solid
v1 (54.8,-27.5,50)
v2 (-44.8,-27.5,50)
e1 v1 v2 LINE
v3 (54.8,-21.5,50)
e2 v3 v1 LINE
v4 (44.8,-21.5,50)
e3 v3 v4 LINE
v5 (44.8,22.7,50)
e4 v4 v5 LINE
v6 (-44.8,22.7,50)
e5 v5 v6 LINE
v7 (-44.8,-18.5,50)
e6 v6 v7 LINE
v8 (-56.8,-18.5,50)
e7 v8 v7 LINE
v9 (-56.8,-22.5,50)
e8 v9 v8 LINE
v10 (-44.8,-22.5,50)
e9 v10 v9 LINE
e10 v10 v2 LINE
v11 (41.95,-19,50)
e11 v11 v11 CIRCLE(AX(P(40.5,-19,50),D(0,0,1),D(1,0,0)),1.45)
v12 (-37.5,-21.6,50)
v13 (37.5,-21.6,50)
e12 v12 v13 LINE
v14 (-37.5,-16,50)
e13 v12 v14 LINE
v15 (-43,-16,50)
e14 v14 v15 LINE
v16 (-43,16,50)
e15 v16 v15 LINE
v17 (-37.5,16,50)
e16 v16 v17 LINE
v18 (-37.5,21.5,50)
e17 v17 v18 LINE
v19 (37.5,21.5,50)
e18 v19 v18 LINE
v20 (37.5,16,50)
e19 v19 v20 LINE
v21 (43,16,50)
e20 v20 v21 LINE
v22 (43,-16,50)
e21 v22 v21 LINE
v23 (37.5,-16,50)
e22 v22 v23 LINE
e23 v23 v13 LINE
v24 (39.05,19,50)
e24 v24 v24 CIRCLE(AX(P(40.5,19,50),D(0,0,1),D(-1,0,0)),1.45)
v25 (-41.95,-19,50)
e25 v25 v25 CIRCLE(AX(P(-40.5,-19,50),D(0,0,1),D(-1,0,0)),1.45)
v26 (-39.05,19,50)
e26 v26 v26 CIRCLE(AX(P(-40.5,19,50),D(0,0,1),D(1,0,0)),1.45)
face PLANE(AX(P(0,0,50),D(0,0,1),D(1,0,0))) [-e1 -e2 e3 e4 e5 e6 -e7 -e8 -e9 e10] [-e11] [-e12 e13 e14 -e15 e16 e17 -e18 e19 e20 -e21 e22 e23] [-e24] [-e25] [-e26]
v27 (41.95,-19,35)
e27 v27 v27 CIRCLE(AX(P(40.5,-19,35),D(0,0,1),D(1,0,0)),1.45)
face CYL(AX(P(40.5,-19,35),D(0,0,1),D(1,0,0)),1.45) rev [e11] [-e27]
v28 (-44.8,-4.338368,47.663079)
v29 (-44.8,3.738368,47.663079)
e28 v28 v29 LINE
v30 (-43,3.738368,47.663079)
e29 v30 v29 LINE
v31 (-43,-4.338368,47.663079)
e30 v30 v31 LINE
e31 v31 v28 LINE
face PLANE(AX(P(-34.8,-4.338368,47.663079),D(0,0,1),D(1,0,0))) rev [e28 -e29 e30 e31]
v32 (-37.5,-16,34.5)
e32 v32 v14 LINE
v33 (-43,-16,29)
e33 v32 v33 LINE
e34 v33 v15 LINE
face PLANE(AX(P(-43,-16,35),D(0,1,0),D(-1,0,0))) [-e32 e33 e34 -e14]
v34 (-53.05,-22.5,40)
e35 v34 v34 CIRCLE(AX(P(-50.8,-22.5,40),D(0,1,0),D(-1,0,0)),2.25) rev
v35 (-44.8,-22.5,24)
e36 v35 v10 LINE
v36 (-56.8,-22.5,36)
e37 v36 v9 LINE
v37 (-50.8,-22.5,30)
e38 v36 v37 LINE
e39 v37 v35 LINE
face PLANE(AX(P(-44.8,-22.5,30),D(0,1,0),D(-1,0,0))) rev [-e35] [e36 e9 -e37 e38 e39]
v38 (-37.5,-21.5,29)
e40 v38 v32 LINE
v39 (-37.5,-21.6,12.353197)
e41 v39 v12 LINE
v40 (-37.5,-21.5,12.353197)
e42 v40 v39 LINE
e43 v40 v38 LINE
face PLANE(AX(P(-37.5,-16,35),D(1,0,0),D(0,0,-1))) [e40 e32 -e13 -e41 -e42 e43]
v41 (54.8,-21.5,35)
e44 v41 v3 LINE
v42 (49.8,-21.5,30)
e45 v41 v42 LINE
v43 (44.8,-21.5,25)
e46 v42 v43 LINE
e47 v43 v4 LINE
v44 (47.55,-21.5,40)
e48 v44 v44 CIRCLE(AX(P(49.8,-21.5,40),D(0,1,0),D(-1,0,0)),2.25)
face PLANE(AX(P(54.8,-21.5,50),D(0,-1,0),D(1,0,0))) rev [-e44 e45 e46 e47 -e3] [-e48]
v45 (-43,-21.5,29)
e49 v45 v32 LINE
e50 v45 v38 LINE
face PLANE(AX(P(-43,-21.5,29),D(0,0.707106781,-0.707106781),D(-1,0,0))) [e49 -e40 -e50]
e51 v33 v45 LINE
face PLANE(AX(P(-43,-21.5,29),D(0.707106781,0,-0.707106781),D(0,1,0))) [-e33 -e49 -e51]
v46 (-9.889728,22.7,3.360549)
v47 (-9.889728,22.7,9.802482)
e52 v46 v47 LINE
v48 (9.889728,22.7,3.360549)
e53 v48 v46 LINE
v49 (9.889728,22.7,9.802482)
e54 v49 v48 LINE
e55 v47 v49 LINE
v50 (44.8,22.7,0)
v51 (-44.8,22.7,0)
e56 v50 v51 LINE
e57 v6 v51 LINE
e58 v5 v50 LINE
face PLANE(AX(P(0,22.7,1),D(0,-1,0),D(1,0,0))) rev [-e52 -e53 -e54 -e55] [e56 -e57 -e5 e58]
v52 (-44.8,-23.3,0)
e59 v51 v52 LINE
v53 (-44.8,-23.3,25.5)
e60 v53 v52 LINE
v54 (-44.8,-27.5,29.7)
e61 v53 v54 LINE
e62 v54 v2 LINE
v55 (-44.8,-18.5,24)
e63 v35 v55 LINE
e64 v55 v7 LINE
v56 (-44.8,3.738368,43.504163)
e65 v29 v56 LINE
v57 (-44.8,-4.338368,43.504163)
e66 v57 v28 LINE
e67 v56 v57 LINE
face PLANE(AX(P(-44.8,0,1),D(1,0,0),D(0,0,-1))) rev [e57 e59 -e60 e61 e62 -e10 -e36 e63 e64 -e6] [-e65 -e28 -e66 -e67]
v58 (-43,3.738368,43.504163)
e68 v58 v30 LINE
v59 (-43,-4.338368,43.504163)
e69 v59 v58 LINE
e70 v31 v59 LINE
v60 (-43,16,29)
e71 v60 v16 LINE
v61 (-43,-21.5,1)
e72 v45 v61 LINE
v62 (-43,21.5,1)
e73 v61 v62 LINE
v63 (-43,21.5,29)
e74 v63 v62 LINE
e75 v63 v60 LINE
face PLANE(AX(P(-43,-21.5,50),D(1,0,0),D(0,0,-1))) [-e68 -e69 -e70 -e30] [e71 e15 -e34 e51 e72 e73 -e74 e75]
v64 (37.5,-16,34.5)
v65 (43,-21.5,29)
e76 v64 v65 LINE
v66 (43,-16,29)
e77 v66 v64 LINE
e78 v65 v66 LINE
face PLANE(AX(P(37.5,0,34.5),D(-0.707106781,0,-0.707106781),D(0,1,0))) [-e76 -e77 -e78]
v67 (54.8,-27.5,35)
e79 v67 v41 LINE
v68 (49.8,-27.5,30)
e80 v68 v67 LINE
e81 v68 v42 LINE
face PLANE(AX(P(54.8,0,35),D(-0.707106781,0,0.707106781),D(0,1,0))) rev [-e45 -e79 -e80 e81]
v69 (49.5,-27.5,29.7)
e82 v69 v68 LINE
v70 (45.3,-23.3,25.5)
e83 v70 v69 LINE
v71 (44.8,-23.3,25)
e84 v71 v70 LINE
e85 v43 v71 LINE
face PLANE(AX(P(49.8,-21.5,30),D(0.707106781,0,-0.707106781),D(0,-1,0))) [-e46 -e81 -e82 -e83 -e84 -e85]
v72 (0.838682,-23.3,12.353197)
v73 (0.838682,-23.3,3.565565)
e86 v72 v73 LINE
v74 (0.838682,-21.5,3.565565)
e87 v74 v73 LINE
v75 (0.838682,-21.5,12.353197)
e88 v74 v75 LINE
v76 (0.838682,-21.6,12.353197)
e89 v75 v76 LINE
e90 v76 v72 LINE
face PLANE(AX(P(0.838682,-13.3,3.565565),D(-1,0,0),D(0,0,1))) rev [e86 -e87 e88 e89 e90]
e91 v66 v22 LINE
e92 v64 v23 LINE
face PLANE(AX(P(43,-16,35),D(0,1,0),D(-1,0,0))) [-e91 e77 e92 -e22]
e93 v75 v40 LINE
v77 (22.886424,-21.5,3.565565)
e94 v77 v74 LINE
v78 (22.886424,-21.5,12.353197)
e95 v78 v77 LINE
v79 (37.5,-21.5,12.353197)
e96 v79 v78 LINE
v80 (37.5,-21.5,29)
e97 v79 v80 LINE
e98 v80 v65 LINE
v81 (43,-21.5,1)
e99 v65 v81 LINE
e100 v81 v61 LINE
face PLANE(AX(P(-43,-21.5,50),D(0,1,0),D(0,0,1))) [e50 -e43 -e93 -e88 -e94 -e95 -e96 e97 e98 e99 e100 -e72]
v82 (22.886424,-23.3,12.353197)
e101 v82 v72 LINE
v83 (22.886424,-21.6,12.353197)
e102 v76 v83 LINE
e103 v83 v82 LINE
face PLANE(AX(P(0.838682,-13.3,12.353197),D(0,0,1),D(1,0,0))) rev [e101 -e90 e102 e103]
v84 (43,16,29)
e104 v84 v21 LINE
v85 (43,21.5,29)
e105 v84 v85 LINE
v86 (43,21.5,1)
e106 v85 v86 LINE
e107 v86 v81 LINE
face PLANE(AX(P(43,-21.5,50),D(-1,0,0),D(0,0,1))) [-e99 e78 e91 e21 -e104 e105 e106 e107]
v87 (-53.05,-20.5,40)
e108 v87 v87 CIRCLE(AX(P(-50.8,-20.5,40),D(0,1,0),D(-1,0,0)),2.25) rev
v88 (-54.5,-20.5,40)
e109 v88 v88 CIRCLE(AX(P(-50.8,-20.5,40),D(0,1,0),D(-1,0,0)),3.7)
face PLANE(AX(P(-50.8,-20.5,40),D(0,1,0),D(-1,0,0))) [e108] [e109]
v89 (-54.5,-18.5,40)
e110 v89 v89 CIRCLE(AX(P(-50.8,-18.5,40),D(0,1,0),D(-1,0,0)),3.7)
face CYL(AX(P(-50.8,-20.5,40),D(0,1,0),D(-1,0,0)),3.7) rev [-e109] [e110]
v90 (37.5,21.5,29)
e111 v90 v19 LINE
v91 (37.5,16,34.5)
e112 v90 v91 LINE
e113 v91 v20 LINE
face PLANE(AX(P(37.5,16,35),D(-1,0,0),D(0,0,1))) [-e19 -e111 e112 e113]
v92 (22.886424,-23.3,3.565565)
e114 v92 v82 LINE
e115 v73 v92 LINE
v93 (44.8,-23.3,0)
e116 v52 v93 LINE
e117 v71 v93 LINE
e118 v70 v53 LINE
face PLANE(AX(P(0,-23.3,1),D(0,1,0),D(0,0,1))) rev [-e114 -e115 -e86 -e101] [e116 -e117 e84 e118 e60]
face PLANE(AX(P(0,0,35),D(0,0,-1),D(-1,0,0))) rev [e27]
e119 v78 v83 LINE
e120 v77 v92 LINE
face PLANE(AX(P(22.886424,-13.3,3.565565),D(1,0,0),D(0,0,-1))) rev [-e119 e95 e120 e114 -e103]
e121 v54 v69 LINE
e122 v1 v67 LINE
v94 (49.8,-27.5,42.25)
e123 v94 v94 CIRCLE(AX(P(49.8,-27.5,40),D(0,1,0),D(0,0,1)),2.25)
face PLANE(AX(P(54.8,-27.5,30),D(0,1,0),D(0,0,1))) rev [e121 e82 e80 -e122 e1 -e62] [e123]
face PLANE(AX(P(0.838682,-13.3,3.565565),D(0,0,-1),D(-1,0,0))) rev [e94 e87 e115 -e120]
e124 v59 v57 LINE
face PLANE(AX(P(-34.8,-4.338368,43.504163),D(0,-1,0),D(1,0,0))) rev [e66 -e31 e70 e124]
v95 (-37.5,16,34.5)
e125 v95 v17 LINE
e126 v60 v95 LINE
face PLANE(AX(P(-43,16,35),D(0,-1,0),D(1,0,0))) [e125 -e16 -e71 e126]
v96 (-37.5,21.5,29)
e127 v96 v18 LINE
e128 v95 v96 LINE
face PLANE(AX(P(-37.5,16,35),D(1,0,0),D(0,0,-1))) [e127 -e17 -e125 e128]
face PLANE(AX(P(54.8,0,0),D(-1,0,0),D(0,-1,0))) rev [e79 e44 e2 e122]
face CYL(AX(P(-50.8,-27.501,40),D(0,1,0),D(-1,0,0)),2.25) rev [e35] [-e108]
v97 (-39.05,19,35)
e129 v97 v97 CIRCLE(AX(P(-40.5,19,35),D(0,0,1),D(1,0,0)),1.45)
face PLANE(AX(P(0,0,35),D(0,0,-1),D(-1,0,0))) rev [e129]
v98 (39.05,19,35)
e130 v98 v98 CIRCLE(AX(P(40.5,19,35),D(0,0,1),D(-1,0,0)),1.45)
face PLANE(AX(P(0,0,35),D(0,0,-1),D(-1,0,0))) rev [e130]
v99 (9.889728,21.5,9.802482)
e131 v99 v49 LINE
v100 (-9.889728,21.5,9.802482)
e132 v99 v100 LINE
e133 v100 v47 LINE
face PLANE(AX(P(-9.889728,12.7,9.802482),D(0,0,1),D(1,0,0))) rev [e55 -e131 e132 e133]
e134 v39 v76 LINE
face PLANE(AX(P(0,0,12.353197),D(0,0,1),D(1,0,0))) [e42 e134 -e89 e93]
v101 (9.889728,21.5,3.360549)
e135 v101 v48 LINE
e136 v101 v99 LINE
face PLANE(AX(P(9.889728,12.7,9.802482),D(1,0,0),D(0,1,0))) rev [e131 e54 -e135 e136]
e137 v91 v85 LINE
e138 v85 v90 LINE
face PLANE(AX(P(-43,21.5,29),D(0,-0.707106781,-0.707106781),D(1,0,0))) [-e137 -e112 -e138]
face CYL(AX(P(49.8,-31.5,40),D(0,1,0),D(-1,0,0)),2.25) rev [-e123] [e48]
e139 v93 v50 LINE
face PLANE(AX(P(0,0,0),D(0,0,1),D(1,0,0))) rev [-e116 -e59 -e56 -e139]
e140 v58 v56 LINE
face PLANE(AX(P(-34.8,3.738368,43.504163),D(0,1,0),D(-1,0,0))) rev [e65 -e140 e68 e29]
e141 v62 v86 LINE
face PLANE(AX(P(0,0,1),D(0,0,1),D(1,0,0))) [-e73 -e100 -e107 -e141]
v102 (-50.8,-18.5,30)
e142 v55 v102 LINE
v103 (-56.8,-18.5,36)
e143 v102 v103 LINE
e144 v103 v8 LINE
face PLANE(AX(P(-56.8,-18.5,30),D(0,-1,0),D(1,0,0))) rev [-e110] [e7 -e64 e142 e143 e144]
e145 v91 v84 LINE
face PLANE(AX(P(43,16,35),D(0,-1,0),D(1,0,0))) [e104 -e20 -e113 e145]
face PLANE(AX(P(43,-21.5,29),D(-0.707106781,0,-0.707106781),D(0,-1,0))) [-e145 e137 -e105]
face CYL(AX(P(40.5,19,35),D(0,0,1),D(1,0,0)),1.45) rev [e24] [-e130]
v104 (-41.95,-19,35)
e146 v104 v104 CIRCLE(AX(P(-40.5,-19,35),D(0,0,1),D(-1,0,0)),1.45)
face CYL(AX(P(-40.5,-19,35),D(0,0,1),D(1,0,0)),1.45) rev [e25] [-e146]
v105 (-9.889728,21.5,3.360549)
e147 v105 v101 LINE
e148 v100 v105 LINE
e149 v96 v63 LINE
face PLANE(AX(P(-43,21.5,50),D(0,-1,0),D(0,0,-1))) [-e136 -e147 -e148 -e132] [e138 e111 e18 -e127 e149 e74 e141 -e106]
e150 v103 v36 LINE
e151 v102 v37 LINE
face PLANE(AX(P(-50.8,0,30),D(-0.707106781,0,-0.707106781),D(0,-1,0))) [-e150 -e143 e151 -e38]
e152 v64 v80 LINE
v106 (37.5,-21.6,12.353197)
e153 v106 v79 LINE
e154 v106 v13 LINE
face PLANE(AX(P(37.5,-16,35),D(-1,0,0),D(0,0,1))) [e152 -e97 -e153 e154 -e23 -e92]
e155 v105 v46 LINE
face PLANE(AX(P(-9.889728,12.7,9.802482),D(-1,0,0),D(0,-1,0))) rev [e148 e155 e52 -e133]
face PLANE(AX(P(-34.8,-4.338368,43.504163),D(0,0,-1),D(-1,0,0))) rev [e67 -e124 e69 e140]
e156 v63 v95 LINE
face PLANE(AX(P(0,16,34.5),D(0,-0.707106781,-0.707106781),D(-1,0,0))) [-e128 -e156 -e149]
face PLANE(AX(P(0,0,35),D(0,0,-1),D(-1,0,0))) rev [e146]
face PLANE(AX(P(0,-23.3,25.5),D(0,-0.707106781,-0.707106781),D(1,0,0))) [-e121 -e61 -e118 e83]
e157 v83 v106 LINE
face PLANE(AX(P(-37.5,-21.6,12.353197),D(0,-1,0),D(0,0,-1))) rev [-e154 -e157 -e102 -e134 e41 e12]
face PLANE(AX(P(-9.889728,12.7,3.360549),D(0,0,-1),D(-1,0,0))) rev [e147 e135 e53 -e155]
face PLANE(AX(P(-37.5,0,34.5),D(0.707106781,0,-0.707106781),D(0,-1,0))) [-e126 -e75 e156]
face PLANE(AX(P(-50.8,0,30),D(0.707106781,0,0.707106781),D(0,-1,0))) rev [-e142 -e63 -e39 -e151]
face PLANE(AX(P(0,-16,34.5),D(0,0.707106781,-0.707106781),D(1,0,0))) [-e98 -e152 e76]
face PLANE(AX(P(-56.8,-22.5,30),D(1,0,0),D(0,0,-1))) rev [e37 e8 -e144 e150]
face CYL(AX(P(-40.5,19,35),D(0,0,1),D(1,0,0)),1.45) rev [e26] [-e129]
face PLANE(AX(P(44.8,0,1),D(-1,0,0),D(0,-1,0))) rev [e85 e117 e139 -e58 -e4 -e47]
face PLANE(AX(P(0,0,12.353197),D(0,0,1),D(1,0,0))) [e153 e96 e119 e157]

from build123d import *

# Parameters (mm, degrees)
SKIZZE1_W                       = 89.6
SKIZZE1_H                       = 46
SKIZZE1_W_2                     = 86
SKIZZE1_H_2                     = 43
AUFSATZ_LINEAR_AUSTRAGEN1_DEPTH = 1
SKIZZE1_3_W                     = 89.6
SKIZZE1_3_H                     = 46
SKIZZE1_3_W_2                   = 86
SKIZZE1_3_H_2                   = 43
AUFSATZ_LINEAR_AUSTRAGEN2_DEPTH = 50
SKIZZE2_W                       = 5.5
SKIZZE2_H                       = 5.5
SKIZZE2_R                       = 1.45
AUFSATZ_LINEAR_AUSTRAGEN3_DEPTH = 15
SKIZZE3_W                       = 5.5
SKIZZE3_H                       = 5.5
AUFSATZ_LINEAR_AUSTRAGEN4_DEPTH = 0.5
FASE1_SIZE                      = 5.5
SKIZZE4_W                       = 4.158916141
SKIZZE4_H                       = 8.076735696
SCHNITT_LINEAR_AUSTRAGEN1_DEPTH = 10
SKIZZE5_W                       = 22.047742135
SKIZZE5_H                       = 8.787632461
SCHNITT_LINEAR_AUSTRAGEN2_DEPTH = 10
SKIZZE6_W                       = 19.779455906
SKIZZE6_H                       = 6.441932887
SCHNITT_LINEAR_AUSTRAGEN3_DEPTH = 10
SKIZZE9_W                       = 20
SKIZZE9_H                       = 6
AUFSATZ_LINEAR_AUSTRAGEN6_DEPTH = 10
SKIZZE10_R                      = 2.25
SCHNITT_LINEAR_AUSTRAGEN5_DEPTH = 10
SKIZZE11_W                      = 75
SKIZZE11_H                      = 0.1
SCHNITT_LINEAR_AUSTRAGEN6_DEPTH = 37.646803
SKIZZE12_W                      = 12
SKIZZE12_H                      = 4
AUFSATZ_LINEAR_AUSTRAGEN7_DEPTH = 20
SCHNITT_LINEAR_AUSTRAGEN7_REACH = 88.161
SKIZZE13_R                      = 2.25
SKIZZE14_R                      = 3.7
SCHNITT_LINEAR_AUSTRAGEN8_DEPTH = 2
SKIZZE15_W                      = 89.6
SKIZZE15_H                      = 4.2
AUFSATZ_LINEAR_AUSTRAGEN8_DEPTH = 20
FASE2_SIZE                      = 4.5
FASE3_SIZE                      = 5
FASE4_SIZE                      = 5
FASE5_SIZE                      = 6


# Some blends are built 0.0001 mm under size
with BuildPart() as part:
    # Skizze1 → Aufsatz-Linear austragen1 (new body)
    # profile 1 of 2: a face of its own
    with BuildSketch(Plane.XY):
        with Locations((0, -0.3)):
            Rectangle(SKIZZE1_W, SKIZZE1_H)
        Rectangle(SKIZZE1_W_2, SKIZZE1_H_2, mode=Mode.SUBTRACT)
    # profile 2 of 2: a face of its own
    with BuildSketch(Plane.XY):
        Rectangle(SKIZZE1_W_2, SKIZZE1_H_2)
    extrude(amount=AUFSATZ_LINEAR_AUSTRAGEN1_DEPTH)

    # Skizze1<3> → Aufsatz-Linear austragen2 (add)
    with BuildSketch(Plane.XY):
        with Locations((0, -0.3)):
            Rectangle(SKIZZE1_3_W, SKIZZE1_3_H)
        Rectangle(SKIZZE1_3_W_2, SKIZZE1_3_H_2, mode=Mode.SUBTRACT)
    extrude(amount=AUFSATZ_LINEAR_AUSTRAGEN2_DEPTH)

    # Skizze2 → Aufsatz-Linear austragen3 (add)
    # profile 1 of 4: a face of its own
    with BuildSketch(Plane.XY.offset(50)):
        with Locations((-40.25, 18.75)):
            Rectangle(SKIZZE2_W, SKIZZE2_H)
        with Locations((-40.5, 19)):
            Circle(SKIZZE2_R, mode=Mode.SUBTRACT)
    # profile 2 of 4: a face of its own
    with BuildSketch(Plane.XY.offset(50)):
        with Locations((-40.25, -18.75)):
            Rectangle(SKIZZE2_W, SKIZZE2_H)
        with Locations(Location((-40.5, -19, 0), (0, 0, 180))):
            Circle(SKIZZE2_R, mode=Mode.SUBTRACT)
    # profile 3 of 4: a face of its own
    with BuildSketch(Plane.XY.offset(50)):
        with Locations((40.25, -18.75)):
            Rectangle(SKIZZE2_W, SKIZZE2_H)
        with Locations((40.5, -19)):
            Circle(SKIZZE2_R, mode=Mode.SUBTRACT)
    # profile 4 of 4: a face of its own
    with BuildSketch(Plane.XY.offset(50)):
        with Locations((40.25, 18.75)):
            Rectangle(SKIZZE2_W, SKIZZE2_H)
        with Locations(Location((40.5, 19, 0), (0, 0, 180))):
            Circle(SKIZZE2_R, mode=Mode.SUBTRACT)
    extrude(amount=-AUFSATZ_LINEAR_AUSTRAGEN3_DEPTH)

    # Skizze3 → Aufsatz-Linear austragen4 (add)
    with BuildSketch(Plane(origin=(0, 0, 35), x_dir=(-1, 0, 0), z_dir=(0, 0, -1))):
        with Locations((-40.25, 18.75)):
            Rectangle(SKIZZE3_W, SKIZZE3_H)
        with Locations((-40.25, -18.75)):
            Rectangle(SKIZZE3_W, SKIZZE3_H)
        with Locations((40.25, -18.75)):
            Rectangle(SKIZZE3_W, SKIZZE3_H)
        with Locations((40.25, 18.75)):
            Rectangle(SKIZZE3_W, SKIZZE3_H)
    extrude(amount=AUFSATZ_LINEAR_AUSTRAGEN4_DEPTH)

    # Fase1
    fase1_edges = [part.edges().sort_by_distance(p)[0] for p in [
        (43, 18.75, 34.5),
        (40.25, 21.5, 34.5),
        (-40.25, -21.5, 34.5),
        (-43, -18.75, 34.5),
        (-43, 18.75, 34.5),
        (-40.25, 21.5, 34.5),
        (40.25, -21.5, 34.5),
        (43, -18.75, 34.5),
    ]]
    chamfer(fase1_edges, length=FASE1_SIZE - 0.0001)  # a hair under: the kernel refuses the full size

    # Skizze4 → Schnitt-Linear austragen1 (cut)
    with BuildSketch(Plane.ZY.offset(44.8)):
        with Locations((45.583621194, -0.3)):
            Rectangle(SKIZZE4_W, SKIZZE4_H)
    extrude(amount=-SCHNITT_LINEAR_AUSTRAGEN1_DEPTH, mode=Mode.SUBTRACT)

    # Skizze5 → Schnitt-Linear austragen2 (cut)
    with BuildSketch(Plane.XZ.offset(23.3)):
        with Locations((11.862553209, 7.95938084)):
            Rectangle(SKIZZE5_W, SKIZZE5_H)
    extrude(amount=-SCHNITT_LINEAR_AUSTRAGEN2_DEPTH, mode=Mode.SUBTRACT)

    # Skizze6 → Schnitt-Linear austragen3 (cut)
    with BuildSketch(Plane(origin=(0, 22.7, 0), x_dir=(1, 0, 0), z_dir=(0, 1, 0))):
        with Locations((0, -6.581515831)):
            Rectangle(SKIZZE6_W, SKIZZE6_H)
    extrude(amount=-SCHNITT_LINEAR_AUSTRAGEN3_DEPTH, mode=Mode.SUBTRACT)

    # Skizze9 → Aufsatz-Linear austragen6 (add)
    with BuildSketch(Plane(origin=(44.8, 0, 0), x_dir=(0, 0, -1), z_dir=(1, 0, 0))):
        with Locations((-40, -24.5)):
            Rectangle(SKIZZE9_W, SKIZZE9_H)
    extrude(amount=AUFSATZ_LINEAR_AUSTRAGEN6_DEPTH)

    # Skizze10 → Schnitt-Linear austragen5 (cut)
    with BuildSketch(Plane(origin=(0, -21.5, 0), x_dir=(1, 0, 0), z_dir=(0, 1, 0))):
        with Locations(Location((49.8, -40, 0), (0, 0, 180))):
            Circle(SKIZZE10_R)
        with Locations((-49.8, -40)):
            Circle(SKIZZE10_R)
    extrude(amount=-SCHNITT_LINEAR_AUSTRAGEN5_DEPTH, mode=Mode.SUBTRACT)

    # Skizze11 → Schnitt-Linear austragen6 (cut)
    with BuildSketch(Plane.XY.offset(50)):
        with Locations((0, -21.55)):
            Rectangle(SKIZZE11_W, SKIZZE11_H)
    extrude(amount=-SCHNITT_LINEAR_AUSTRAGEN6_DEPTH, mode=Mode.SUBTRACT)

    # Skizze12 → Aufsatz-Linear austragen7 (add)
    with BuildSketch(Plane.XY.offset(50)):
        with Locations((-50.8, -20.500000001)):
            Rectangle(SKIZZE12_W, SKIZZE12_H)
    extrude(amount=-AUFSATZ_LINEAR_AUSTRAGEN7_DEPTH)

    # Skizze13 → Schnitt-Linear austragen7 (cut, up to next)
    with BuildSketch(Plane(origin=(0, -18.500000001, 0), x_dir=(1, 0, 0), z_dir=(0, 1, 0)), mode=Mode.PRIVATE) as schnitt_linear_austragen7_sk1:
        with Locations(Location((-50.8, -40, 0), (0, 0, 180))):
            Circle(SKIZZE13_R)
    schnitt_linear_austragen7_tool1 = extrude(schnitt_linear_austragen7_sk1.sketch, amount=-SCHNITT_LINEAR_AUSTRAGEN7_REACH, mode=Mode.PRIVATE) & part.part
    add(schnitt_linear_austragen7_tool1.solids().sort_by_distance((-50.8, -18.5, 40))[0], mode=Mode.SUBTRACT)

    # Skizze14 → Schnitt-Linear austragen8 (cut)
    with BuildSketch(Plane(origin=(0, -18.500000001, 0), x_dir=(1, 0, 0), z_dir=(0, 1, 0))):
        with Locations(Location((-50.8, -40, 0), (0, 0, 180))):
            Circle(SKIZZE14_R)
    extrude(amount=-SCHNITT_LINEAR_AUSTRAGEN8_DEPTH, mode=Mode.SUBTRACT)

    # Skizze15 → Aufsatz-Linear austragen8 (add)
    with BuildSketch(Plane.XY.offset(50)):
        with Locations((0, -25.4)):
            Rectangle(SKIZZE15_W, SKIZZE15_H)
    extrude(amount=-AUFSATZ_LINEAR_AUSTRAGEN8_DEPTH)

    # Fase2
    # the kernel refuses this chamfer: 4.5 mm, written as the material it adds along each edge
    with BuildSketch(Plane(origin=(-44.8, -23.3, 30), x_dir=(0, 0.02749587661058602, -0.9996219169112969), z_dir=(1, 0, 0))) as fase2_piece_1_section:
        Polygon((FASE2_SIZE * 0.999621916911, -FASE2_SIZE * 0.0274958766106), (-FASE2_SIZE * 0.0274958766106, -FASE2_SIZE * 0.999621916911), (0, 0), align=None)
    fase2_piece_1 = extrude(amount=89.6, mode=Mode.PRIVATE)
    fase2_piece_1 = split(fase2_piece_1, bisect_by=Plane(origin=(0, -27.5, 28.499089477), z_dir=(0, 1, 0)), keep=Keep.TOP, mode=Mode.PRIVATE)
    add(fase2_piece_1)

    # Fase3
    fase3_edges = [part.edges().sort_by_distance(p)[0] for p in [
        (44.8, -24.5, 30),
    ]]
    chamfer(fase3_edges, length=FASE3_SIZE)

    # Fase4
    fase4_edges = [part.edges().sort_by_distance(p)[0] for p in [
        (54.8, -24.5, 30),
    ]]
    chamfer(fase4_edges, length=FASE4_SIZE - 0.0001)  # a hair under: the kernel refuses the full size

    # Fase5
    fase5_edges = [part.edges().sort_by_distance(p)[0] for p in [
        (-44.8, -20.500000001, 30),
    ]]
    chamfer(fase5_edges, length=FASE5_SIZE)
    fase5_2_edges = [part.edges().sort_by_distance(p)[0] for p in [
        (-56.8, -20.500000001, 30),
    ]]
    chamfer(fase5_2_edges, length=FASE5_SIZE - 0.0001)  # a hair under: the kernel refuses the full size


solid = part.part
